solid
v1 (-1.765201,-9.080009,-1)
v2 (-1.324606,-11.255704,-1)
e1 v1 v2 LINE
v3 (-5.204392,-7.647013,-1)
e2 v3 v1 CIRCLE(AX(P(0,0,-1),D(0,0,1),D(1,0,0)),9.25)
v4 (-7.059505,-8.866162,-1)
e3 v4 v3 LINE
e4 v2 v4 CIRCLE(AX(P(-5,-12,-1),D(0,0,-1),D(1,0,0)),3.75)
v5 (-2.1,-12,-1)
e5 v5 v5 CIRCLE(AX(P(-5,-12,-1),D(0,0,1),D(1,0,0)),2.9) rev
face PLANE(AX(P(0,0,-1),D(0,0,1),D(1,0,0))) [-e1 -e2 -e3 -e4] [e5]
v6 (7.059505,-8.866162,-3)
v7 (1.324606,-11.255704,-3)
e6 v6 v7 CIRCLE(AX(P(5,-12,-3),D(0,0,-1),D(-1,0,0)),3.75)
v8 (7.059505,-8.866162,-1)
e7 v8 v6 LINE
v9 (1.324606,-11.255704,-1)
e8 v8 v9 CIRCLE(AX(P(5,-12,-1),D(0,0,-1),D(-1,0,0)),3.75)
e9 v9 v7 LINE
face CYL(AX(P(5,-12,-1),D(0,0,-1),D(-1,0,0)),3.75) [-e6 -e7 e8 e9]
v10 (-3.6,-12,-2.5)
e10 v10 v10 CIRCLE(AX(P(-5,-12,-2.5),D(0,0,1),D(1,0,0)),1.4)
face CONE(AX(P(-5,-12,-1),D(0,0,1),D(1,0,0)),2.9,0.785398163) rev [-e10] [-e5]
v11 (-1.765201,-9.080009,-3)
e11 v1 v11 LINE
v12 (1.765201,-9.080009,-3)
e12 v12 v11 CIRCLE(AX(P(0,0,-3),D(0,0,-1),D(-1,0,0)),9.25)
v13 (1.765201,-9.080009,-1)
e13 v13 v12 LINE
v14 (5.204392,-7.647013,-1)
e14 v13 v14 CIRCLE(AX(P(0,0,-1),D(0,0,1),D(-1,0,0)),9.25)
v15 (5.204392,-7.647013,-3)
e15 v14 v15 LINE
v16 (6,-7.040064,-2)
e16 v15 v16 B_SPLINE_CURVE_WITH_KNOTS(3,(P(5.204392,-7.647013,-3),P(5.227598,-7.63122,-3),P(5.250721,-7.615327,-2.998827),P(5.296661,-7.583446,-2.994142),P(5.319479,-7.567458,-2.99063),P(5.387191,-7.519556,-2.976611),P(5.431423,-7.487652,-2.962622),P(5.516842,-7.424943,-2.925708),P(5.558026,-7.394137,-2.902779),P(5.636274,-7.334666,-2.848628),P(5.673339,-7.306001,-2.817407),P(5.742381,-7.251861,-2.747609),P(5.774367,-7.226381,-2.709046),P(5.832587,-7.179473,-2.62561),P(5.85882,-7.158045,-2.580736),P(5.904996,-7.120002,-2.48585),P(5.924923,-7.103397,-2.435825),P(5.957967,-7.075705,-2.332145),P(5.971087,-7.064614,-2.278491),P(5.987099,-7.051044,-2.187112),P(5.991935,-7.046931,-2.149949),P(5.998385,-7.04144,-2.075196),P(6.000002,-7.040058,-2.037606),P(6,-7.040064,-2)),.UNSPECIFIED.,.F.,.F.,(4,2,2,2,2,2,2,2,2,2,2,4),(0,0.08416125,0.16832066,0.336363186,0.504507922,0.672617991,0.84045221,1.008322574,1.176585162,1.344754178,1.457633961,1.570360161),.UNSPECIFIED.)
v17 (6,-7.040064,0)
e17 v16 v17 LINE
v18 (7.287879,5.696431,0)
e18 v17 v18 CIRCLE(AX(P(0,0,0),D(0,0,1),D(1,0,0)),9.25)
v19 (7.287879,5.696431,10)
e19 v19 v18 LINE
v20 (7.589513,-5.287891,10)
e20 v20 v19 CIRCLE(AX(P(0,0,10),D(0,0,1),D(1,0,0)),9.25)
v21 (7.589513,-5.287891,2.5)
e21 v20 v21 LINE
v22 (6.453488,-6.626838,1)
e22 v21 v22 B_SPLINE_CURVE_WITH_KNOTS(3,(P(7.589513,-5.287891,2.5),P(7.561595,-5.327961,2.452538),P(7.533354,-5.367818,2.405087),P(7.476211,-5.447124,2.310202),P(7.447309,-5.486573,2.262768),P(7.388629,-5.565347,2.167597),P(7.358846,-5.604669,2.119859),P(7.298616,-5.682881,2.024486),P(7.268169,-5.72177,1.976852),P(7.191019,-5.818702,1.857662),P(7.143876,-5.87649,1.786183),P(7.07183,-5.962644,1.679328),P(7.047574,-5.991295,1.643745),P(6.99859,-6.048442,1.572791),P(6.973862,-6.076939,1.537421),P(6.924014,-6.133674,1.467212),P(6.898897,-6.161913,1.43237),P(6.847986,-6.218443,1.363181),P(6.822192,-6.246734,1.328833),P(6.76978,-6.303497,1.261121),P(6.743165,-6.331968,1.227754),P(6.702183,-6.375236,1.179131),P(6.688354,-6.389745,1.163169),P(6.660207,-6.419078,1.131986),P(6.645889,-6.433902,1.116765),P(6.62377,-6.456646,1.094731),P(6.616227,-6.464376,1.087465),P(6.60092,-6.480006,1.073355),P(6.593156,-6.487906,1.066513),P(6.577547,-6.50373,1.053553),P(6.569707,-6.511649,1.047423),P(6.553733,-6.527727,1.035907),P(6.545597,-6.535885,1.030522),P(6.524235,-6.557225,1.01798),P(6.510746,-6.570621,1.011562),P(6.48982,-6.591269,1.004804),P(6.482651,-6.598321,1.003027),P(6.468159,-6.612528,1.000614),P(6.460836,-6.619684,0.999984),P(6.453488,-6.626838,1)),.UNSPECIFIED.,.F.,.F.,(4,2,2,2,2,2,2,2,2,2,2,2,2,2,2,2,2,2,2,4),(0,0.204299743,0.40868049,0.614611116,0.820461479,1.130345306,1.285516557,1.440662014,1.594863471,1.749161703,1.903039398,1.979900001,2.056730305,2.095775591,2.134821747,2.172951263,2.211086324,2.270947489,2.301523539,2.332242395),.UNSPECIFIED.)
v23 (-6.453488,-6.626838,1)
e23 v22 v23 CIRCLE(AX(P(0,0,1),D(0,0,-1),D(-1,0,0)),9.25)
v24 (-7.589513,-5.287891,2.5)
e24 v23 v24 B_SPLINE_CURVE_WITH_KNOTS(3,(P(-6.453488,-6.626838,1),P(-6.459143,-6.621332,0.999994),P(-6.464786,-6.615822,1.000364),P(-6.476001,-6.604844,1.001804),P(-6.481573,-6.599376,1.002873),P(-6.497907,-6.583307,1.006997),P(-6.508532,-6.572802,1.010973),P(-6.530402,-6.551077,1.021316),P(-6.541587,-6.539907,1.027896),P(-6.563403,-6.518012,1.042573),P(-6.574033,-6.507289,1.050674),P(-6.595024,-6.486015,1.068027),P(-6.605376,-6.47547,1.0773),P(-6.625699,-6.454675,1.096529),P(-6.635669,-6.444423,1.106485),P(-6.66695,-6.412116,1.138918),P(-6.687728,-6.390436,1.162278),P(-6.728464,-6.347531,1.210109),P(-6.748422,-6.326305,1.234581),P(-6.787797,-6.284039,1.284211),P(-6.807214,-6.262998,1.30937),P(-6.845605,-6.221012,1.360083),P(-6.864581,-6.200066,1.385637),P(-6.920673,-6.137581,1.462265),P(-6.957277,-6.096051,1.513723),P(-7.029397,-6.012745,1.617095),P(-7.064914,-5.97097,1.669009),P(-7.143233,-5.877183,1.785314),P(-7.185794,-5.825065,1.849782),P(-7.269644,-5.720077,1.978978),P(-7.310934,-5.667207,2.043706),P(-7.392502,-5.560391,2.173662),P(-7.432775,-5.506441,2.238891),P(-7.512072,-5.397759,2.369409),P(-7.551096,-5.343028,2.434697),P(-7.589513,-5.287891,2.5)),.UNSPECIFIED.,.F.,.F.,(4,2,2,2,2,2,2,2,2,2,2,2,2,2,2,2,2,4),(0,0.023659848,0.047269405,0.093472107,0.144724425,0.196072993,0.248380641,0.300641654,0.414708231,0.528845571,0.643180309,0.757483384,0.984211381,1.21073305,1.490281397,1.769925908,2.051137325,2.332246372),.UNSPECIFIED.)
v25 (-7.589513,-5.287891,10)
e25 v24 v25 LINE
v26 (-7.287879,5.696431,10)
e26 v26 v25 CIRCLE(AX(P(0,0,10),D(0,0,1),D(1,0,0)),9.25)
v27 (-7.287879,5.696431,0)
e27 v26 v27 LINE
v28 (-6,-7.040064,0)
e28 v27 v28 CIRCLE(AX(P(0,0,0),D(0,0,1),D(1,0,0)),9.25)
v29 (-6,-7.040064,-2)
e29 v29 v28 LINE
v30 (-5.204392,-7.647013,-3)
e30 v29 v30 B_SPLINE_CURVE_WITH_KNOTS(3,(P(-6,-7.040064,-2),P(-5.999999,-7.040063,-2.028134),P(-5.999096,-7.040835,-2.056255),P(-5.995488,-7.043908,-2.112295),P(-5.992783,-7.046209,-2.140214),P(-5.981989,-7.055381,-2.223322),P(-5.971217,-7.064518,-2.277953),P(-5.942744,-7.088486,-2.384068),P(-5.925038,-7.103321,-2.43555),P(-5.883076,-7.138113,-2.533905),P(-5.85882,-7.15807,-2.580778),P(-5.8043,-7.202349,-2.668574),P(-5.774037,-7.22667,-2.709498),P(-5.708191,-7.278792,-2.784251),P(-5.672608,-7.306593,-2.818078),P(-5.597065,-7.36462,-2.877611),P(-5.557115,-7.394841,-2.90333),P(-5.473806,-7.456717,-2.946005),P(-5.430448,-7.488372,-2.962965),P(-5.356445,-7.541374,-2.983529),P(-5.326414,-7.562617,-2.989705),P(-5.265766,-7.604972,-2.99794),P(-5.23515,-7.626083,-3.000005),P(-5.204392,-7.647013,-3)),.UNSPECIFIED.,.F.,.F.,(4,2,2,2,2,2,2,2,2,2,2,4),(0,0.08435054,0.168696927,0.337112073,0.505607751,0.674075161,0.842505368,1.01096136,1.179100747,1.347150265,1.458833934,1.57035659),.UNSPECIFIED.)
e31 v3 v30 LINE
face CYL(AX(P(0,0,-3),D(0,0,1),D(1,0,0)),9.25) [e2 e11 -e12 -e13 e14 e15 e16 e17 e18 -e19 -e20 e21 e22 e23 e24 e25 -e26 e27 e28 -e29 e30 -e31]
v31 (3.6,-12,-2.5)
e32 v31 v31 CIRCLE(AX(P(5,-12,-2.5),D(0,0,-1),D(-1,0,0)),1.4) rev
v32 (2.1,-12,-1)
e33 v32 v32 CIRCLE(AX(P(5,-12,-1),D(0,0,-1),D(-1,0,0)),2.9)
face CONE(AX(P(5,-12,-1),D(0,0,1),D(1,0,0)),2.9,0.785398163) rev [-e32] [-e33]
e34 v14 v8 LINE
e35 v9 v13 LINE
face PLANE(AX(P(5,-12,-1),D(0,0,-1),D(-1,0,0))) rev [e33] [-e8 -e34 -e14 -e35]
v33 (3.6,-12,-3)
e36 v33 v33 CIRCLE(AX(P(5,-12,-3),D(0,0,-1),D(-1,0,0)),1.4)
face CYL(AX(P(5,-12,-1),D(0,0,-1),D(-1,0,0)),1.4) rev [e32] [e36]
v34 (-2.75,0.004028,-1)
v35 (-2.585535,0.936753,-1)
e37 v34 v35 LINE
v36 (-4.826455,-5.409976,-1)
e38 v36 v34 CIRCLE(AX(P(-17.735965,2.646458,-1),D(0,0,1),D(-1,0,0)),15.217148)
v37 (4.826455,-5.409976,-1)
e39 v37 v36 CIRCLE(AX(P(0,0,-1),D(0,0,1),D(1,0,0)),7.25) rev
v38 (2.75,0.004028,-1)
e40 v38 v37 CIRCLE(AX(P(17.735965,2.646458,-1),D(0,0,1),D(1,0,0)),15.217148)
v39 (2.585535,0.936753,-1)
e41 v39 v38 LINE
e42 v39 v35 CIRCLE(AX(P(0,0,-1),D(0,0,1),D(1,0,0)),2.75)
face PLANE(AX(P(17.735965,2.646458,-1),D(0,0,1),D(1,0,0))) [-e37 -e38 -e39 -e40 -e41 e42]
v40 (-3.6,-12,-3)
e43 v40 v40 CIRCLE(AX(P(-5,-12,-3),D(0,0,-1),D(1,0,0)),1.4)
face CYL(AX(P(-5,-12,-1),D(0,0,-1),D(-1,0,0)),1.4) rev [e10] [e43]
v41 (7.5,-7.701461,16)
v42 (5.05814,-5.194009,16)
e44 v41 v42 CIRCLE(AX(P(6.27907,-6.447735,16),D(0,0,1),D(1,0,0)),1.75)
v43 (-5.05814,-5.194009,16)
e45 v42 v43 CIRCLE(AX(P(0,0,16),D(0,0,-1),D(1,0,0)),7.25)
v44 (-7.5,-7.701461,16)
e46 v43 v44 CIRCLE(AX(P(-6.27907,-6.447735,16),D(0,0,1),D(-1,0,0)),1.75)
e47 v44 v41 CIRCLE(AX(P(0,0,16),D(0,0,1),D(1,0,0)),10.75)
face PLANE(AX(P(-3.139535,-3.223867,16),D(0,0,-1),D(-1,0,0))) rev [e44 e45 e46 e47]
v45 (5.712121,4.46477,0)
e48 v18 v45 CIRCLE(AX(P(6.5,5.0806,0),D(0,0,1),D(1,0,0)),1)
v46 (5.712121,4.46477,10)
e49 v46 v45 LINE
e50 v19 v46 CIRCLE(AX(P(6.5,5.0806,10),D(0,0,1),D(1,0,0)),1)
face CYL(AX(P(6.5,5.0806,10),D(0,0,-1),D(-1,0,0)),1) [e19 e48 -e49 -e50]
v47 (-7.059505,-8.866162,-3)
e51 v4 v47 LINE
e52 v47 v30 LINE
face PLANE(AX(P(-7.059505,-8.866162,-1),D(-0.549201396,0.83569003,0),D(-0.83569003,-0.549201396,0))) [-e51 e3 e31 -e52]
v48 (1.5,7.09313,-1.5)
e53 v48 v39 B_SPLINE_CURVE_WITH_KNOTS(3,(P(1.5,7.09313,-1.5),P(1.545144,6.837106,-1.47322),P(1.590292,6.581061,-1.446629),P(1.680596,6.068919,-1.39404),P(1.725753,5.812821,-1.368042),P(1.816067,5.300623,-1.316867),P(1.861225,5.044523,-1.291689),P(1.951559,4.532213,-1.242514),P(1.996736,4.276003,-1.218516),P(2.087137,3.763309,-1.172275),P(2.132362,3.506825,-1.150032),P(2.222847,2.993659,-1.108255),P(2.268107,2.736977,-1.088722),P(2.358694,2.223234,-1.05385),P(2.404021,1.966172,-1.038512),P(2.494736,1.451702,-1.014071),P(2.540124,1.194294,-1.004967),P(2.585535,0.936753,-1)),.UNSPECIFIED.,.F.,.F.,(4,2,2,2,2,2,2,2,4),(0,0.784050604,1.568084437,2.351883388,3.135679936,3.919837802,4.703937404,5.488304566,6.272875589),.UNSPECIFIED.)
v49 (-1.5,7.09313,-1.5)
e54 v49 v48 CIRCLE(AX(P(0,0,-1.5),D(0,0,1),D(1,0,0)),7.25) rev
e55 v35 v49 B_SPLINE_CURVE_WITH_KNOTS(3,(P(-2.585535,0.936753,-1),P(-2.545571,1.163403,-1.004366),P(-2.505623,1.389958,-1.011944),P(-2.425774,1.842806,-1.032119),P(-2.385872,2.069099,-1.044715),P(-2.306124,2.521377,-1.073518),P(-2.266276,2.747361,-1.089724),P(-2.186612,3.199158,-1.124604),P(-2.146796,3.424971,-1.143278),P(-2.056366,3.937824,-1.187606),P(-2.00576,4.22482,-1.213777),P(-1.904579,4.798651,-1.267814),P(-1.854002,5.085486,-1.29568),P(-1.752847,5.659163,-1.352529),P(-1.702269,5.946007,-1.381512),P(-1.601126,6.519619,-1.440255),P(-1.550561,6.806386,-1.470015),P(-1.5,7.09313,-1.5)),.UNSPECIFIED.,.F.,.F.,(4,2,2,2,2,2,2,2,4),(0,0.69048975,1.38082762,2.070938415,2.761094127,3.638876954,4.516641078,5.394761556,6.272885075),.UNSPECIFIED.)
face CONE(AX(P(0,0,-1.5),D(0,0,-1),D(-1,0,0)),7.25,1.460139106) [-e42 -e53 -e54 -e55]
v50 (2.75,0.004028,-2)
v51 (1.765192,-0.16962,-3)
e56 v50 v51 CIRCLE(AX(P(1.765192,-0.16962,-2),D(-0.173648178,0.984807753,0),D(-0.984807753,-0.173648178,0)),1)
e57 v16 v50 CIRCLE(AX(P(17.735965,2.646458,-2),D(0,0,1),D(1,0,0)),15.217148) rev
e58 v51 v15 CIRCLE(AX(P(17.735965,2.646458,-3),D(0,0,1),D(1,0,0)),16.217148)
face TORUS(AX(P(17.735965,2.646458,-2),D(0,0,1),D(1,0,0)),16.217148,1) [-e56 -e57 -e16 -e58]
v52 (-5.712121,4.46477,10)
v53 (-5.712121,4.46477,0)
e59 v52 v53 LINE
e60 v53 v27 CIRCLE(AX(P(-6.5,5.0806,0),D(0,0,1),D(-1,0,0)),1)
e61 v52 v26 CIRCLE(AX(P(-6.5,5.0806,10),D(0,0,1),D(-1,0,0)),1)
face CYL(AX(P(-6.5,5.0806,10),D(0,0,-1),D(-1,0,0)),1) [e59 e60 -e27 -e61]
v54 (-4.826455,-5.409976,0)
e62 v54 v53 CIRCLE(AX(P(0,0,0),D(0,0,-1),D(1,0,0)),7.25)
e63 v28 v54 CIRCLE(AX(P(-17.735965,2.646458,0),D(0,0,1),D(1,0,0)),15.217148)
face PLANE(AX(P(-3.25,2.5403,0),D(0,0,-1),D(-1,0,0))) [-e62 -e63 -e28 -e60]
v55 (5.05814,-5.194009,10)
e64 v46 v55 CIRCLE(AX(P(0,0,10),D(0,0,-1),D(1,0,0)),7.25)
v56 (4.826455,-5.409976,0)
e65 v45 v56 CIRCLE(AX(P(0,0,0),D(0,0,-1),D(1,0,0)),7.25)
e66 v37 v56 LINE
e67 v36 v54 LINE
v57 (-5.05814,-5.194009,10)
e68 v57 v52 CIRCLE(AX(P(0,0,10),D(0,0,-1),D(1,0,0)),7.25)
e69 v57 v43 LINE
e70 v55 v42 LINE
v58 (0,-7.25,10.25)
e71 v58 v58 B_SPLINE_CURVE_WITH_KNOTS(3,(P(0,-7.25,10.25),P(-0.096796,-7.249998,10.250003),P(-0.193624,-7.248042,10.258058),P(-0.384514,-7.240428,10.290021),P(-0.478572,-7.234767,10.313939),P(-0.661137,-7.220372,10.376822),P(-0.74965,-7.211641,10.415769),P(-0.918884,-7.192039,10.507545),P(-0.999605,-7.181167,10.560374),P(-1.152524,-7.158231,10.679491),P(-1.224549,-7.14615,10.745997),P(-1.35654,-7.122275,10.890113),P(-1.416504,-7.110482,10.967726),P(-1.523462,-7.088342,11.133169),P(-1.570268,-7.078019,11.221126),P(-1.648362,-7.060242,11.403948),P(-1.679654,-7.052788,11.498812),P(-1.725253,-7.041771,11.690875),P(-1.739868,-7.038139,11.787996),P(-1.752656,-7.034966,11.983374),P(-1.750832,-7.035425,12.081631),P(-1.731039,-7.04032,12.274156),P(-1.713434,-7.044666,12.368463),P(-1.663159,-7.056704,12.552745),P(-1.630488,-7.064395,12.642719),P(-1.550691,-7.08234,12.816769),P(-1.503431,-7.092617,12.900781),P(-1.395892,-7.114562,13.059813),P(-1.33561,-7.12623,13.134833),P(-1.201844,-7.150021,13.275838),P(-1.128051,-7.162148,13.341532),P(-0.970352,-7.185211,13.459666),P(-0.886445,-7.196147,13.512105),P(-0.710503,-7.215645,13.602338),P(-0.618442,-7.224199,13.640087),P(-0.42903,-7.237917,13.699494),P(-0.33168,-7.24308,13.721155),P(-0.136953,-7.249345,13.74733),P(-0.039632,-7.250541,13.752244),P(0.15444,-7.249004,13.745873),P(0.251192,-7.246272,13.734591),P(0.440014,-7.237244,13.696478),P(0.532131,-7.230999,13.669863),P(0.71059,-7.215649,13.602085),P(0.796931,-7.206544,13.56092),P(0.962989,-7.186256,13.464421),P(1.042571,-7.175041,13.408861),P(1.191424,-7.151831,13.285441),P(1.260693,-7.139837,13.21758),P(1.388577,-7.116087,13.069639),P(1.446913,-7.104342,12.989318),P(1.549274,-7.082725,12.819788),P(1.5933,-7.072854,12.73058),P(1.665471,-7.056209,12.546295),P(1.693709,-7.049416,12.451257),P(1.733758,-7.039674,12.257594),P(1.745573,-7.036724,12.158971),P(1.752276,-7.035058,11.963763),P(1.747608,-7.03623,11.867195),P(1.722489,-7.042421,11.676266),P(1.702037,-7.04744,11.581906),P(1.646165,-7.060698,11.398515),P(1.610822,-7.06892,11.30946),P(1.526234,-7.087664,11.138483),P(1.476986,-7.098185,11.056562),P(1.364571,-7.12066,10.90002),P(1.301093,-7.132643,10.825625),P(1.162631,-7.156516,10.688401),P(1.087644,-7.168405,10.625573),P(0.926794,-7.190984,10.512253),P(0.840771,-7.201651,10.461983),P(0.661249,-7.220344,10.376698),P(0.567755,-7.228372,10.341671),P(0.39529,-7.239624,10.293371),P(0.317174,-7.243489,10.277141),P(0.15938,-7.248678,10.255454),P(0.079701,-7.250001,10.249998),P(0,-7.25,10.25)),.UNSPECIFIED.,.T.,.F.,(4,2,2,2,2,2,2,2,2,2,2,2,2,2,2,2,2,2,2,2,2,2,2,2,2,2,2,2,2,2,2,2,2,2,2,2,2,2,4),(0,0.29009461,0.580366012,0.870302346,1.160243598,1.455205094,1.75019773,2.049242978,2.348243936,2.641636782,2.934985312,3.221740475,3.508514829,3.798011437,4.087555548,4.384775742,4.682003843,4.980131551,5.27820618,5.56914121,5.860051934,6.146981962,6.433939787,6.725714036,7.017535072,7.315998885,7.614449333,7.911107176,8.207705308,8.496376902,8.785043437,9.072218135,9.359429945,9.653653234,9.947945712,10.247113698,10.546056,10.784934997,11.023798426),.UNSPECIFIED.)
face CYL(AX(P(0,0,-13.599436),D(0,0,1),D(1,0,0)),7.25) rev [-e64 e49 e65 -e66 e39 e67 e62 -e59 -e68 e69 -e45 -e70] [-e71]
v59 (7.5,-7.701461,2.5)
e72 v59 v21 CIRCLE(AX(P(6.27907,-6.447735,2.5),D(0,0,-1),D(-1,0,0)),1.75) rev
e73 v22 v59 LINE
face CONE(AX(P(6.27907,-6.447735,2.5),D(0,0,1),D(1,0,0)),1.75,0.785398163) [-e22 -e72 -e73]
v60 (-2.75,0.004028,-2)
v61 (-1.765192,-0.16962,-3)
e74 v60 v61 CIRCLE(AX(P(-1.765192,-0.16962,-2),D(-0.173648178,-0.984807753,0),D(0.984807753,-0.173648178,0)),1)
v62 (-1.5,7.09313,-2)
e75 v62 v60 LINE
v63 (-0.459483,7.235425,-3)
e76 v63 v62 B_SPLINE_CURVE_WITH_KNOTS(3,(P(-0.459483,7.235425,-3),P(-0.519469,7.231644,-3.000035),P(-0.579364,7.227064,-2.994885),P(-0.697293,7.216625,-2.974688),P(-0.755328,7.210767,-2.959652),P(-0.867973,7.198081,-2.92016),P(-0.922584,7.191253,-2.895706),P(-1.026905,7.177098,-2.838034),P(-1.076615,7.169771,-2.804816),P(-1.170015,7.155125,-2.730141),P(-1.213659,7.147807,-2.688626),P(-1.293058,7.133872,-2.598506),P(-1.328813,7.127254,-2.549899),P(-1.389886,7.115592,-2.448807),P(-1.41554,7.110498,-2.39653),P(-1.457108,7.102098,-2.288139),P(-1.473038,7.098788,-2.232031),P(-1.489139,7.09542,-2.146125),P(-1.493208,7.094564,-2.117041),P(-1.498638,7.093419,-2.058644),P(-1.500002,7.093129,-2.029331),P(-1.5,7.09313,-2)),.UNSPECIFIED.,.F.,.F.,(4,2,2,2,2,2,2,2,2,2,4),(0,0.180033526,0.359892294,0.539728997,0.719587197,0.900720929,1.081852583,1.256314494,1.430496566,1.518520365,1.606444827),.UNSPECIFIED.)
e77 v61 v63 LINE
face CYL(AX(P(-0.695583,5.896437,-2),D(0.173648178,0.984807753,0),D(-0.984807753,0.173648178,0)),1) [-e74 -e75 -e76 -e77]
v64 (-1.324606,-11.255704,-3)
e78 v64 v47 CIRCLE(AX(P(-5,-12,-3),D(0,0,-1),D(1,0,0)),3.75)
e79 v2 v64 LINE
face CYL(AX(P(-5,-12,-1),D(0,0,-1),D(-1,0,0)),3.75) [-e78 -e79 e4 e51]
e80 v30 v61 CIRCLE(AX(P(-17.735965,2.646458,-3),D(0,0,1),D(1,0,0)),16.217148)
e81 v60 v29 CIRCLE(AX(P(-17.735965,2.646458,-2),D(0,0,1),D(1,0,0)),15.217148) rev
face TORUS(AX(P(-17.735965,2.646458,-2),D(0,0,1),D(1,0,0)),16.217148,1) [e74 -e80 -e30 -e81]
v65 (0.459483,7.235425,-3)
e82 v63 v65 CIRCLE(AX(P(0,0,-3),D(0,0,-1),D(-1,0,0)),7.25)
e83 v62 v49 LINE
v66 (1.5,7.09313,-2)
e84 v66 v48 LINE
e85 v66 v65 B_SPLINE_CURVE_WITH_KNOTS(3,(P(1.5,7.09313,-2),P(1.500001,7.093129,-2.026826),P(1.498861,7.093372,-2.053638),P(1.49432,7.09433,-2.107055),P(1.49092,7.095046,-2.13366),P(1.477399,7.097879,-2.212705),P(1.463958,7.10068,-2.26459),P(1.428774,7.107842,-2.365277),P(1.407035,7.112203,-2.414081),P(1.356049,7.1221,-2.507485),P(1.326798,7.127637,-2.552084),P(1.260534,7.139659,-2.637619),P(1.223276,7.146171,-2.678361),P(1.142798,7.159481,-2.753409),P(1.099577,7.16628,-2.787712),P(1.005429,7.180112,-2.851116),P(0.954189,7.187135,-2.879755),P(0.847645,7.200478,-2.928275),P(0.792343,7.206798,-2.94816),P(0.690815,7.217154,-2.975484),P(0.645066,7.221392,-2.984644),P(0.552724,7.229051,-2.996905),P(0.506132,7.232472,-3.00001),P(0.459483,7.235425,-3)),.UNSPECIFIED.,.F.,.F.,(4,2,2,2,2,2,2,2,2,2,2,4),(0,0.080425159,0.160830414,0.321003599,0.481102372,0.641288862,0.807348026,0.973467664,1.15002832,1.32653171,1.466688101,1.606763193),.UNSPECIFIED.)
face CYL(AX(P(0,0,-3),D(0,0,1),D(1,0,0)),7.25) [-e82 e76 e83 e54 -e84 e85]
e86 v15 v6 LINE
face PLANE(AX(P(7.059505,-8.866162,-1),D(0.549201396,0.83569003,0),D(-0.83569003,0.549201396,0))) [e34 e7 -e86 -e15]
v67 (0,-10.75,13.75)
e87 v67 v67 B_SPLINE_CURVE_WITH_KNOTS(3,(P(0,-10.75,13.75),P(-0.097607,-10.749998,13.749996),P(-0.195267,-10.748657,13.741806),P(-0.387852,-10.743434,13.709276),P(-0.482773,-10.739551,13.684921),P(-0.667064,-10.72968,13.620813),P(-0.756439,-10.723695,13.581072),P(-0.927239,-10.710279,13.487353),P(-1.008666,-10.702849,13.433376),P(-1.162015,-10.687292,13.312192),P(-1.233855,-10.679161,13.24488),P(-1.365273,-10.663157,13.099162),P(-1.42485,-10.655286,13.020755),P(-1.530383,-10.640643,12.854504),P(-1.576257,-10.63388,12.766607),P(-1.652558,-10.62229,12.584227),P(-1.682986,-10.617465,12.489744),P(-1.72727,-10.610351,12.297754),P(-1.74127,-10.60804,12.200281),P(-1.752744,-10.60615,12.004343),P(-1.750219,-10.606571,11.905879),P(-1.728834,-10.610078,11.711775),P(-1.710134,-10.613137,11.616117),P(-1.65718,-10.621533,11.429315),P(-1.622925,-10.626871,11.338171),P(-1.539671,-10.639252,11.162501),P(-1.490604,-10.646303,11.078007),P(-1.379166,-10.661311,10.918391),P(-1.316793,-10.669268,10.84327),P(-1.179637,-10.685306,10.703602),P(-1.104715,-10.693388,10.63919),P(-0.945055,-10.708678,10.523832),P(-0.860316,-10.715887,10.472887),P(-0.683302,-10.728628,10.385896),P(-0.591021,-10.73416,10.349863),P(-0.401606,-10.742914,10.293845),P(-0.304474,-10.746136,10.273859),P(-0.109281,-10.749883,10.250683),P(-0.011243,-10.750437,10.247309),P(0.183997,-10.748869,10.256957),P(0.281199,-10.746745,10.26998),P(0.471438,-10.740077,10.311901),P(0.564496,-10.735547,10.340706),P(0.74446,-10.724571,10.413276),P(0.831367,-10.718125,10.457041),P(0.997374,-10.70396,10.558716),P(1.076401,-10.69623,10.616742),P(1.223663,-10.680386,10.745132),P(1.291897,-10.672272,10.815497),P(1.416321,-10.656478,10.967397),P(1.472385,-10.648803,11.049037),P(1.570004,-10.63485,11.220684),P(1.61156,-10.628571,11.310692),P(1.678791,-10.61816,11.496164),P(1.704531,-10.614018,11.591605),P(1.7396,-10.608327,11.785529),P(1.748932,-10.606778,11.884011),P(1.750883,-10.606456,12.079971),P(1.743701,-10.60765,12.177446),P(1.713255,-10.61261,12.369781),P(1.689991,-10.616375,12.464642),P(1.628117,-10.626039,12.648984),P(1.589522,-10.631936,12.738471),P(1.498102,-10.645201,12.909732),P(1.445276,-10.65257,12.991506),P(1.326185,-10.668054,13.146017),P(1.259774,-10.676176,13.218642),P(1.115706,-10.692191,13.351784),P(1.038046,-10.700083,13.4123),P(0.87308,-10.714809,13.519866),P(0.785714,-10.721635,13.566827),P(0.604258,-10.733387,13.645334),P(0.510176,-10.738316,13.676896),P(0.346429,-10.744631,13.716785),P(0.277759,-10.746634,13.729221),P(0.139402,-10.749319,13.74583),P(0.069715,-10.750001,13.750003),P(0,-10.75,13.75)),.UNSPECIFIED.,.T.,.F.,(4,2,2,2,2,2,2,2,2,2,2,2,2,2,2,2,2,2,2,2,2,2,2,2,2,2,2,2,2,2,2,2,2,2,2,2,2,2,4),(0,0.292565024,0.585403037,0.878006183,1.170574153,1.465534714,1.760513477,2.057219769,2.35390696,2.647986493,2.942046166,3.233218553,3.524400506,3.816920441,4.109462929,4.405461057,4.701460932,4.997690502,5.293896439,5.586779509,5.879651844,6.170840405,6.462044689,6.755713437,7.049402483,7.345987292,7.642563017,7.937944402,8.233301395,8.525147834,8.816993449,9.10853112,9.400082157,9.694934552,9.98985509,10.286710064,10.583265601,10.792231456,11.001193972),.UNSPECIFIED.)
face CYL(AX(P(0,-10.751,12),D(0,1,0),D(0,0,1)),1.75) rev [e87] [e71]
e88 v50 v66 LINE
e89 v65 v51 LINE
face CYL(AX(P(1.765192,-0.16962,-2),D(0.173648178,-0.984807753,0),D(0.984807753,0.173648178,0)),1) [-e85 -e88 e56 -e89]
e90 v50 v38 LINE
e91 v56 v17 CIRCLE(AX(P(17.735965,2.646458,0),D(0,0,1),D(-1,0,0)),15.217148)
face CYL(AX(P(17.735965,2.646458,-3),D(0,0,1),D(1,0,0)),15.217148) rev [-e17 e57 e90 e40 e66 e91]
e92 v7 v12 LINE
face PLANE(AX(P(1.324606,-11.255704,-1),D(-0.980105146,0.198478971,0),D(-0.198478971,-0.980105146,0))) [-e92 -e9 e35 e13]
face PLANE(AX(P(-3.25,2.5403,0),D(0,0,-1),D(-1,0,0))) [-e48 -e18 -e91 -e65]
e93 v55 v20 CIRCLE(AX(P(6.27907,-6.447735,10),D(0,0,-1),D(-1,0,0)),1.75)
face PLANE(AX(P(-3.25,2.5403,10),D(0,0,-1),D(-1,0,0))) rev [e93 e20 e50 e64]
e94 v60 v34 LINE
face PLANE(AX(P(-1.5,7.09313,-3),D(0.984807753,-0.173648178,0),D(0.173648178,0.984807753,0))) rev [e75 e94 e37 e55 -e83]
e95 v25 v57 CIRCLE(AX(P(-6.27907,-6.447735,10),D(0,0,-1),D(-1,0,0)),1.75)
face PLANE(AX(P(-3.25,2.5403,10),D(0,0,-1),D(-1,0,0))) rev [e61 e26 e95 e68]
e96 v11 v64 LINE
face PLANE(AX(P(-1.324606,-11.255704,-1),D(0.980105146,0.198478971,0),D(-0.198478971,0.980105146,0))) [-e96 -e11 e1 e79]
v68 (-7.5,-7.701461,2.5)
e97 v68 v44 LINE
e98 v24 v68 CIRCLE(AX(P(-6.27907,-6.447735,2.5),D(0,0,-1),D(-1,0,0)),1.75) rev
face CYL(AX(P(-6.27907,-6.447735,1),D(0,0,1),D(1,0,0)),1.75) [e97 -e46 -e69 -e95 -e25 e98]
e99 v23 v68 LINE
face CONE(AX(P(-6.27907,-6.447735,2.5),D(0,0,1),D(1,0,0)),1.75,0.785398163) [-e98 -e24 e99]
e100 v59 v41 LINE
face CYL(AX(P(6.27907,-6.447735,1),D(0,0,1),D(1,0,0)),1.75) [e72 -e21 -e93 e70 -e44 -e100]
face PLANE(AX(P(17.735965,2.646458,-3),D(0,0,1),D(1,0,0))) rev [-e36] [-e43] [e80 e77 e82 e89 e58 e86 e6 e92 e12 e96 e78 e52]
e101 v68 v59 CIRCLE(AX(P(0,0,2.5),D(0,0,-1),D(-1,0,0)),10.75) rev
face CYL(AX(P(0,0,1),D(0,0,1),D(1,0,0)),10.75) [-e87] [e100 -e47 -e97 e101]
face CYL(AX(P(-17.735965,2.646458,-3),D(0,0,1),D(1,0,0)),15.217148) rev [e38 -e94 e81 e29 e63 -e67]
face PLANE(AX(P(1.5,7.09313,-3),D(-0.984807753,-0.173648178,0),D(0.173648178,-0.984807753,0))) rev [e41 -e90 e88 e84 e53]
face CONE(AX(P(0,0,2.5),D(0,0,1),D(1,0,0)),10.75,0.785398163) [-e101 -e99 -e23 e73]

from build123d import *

# Parameters (mm, degrees)
EXTRUDE_577_DEPTH                       = 10
EXTRUDE_START                           = 3
EXTRUDE_1331_DEPTH                      = 2
FILLET_1_R                              = 1
EXTRUDE_2001_DEPTH                      = 6
EXTRUDE_2001_DEPTH_BACK                 = 9
CUT_EXTRUDE_2109_REACH                  = 26.775
CUT_EXTRUDE_2109_END_RADIUS             = 7.25
SKETCH_6_R                              = 1.75
CUT_EXTRUDE_2109_DIRECTION_2_REACH      = 26.775
CUT_EXTRUDE_2109_DIRECTION_2_END_RADIUS = 10.75
SKETCH_7_R                              = 1.4
EXTRUDE_2720_DEPTH                      = 2
EXTRUDE_2720_2_DEPTH                    = 2
CHAMFER_2_SIZE                          = 1.5
EXTRUDE_START_2                         = 1
EXTRUDE_3078_DEPTH                      = 1
CHAMFER_3_SIZE                          = 1.5
CHAMFER_4_SIZE                          = 4.5
CHAMFER_4_SIZE2                         = 0.5


# Some blends are built 0.0001 mm under size
with BuildPart() as part:
    # Эскиз1 → Extrude 577 (new body)
    with BuildSketch(Plane.XY):
        with BuildLine():
            ThreePointArc((-5.712121212, 4.464770012), (0, -7.25), (5.712121212, 4.464770012))
            ThreePointArc((5.712121212, 4.464770012), (5.884169654, 5.868479146), (7.287878788, 5.696430705))
            ThreePointArc((7.287878788, 5.696430705), (0, -9.25), (-7.287878788, 5.696430705))
            ThreePointArc((-7.287878788, 5.696430705), (-5.884169654, 5.868479146), (-5.712121212, 4.464770012))
        make_face()
    extrude(amount=EXTRUDE_577_DEPTH)

    # Эскиз5 → Extrude 2001 (add, two sides: drawn at the far end of the back side and taken through both)
    with BuildSketch(Plane.XY.offset(10).offset(-EXTRUDE_2001_DEPTH_BACK)):
        with BuildLine():
            ThreePointArc((-5.058139535, -5.194008514), (0, -7.25), (5.058139535, -5.194008514))
            ThreePointArc((5.058139535, -5.194008514), (7.532795961, -5.226804475), (7.5, -7.7014609))
            ThreePointArc((7.5, -7.7014609), (0, -10.75), (-7.5, -7.7014609))
            ThreePointArc((-7.5, -7.7014609), (-7.532795961, -5.226804475), (-5.058139535, -5.194008514))
        make_face()
    extrude(amount=EXTRUDE_2001_DEPTH + EXTRUDE_2001_DEPTH_BACK)

    # Cut-Extrude 2109: up to this cylinder (the profile starts outside it)
    cut_extrude_2109_end = Plane(origin=(0, 0, 12), z_dir=(0, 0, -1)) * Cylinder(CUT_EXTRUDE_2109_END_RADIUS, 69.05, mode=Mode.PRIVATE)
    # Эскиз6 → Cut-Extrude 2109 (cut, up to the surface)
    with BuildSketch(Plane(origin=(0, -9.25, 0), x_dir=(-1, 0, 0), z_dir=(0, -1, 0)), mode=Mode.PRIVATE) as cut_extrude_2109_sk1:
        with Locations(Location((0, -12, 0), (0, 0, 270))):
            Circle(SKETCH_6_R)
    cut_extrude_2109_tool1 = extrude(cut_extrude_2109_sk1.sketch, amount=-CUT_EXTRUDE_2109_REACH, mode=Mode.PRIVATE) - cut_extrude_2109_end
    add(cut_extrude_2109_tool1.solids().sort_by_distance((0, -9.25, 12))[0], mode=Mode.SUBTRACT)

    # Cut-Extrude 2109 direction 2: up to this cylinder (the profile starts inside it)
    cut_extrude_2109_direction_2_end = Plane(origin=(0, 0, 12), z_dir=(0, 0, 1)) * Cylinder(CUT_EXTRUDE_2109_DIRECTION_2_END_RADIUS, 76.05, mode=Mode.PRIVATE)
    # Эскиз6 → Cut-Extrude 2109 direction 2 (cut, up to the surface)
    with BuildSketch(Plane(origin=(0, -9.25, 0), x_dir=(-1, 0, 0), z_dir=(0, -1, 0)), mode=Mode.PRIVATE) as cut_extrude_2109_direction_2_sk1:
        with Locations(Location((0, -12, 0), (0, 0, 270))):
            Circle(SKETCH_6_R)
    cut_extrude_2109_direction_2_tool1 = extrude(cut_extrude_2109_direction_2_sk1.sketch, amount=CUT_EXTRUDE_2109_DIRECTION_2_REACH, mode=Mode.PRIVATE) & cut_extrude_2109_direction_2_end
    add(cut_extrude_2109_direction_2_tool1.solids().sort_by_distance((0, -9.25, 12))[0], mode=Mode.SUBTRACT)

    # Фаска2
    chamfer_2_edges = [part.edges().sort_by_distance(p)[0] for p in [
        (-8.027867462, -6.512593205, 1),
        (8.027867462, -6.512593205, 1),
        (0, -10.75, 1),
    ]]
    chamfer(chamfer_2_edges, length=CHAMFER_2_SIZE - 0.0001)  # a hair under: the kernel refuses the full size



with BuildPart() as body_2:
    # Эскиз3 → Extrude 1331 (new body)
    with BuildSketch(Plane(origin=(0, 0, 0), x_dir=(-1, 0, 0), z_dir=(0, 0, -1)).offset(EXTRUDE_START)):
        with BuildLine():
            Line((-1.5, 7.09313048), (-2.75, 0.004028205))
            ThreePointArc((-2.75, 0.004028205), (-3.918577626, -3.728601804), (-6, -7.04006392))
            ThreePointArc((-6, -7.04006392), (0, -9.25), (6, -7.04006392))
            ThreePointArc((6, -7.04006392), (3.918577626, -3.728601804), (2.75, 0.004028205))
            Line((2.75, 0.004028205), (1.5, 7.09313048))
            ThreePointArc((1.5, 7.09313048), (0, 7.25), (-1.5, 7.09313048))
        make_face()
    extrude(amount=-EXTRUDE_1331_DEPTH)

    # Скругление1
    # the kernel refuses this fillet: 1 mm, written as the material it takes off along each edge
    with BuildSketch(Plane(origin=(-17.735965382, 2.646458234, -3), x_dir=(0.6567344577177726, -0.7541219079473445, 0), z_dir=(-0.7541219079473445, -0.6567344577177726, 0))) as fillet_1_piece_1:
        with BuildLine():
            CenterArc((15.217148054 + FILLET_1_R, FILLET_1_R), FILLET_1_R, 180, 90)
            Line((15.217148054 + FILLET_1_R, 0), (15.217148054, 0))
            Line((15.217148054, 0), (15.217148054, FILLET_1_R))
        make_face()
    revolve(axis=Axis((-17.735965382, 2.646458234, -3), (0, 0, 1)), revolution_arc=38.948703068, mode=Mode.SUBTRACT)
    with BuildSketch(Plane(origin=(-2.75, 0.004028205, -3), x_dir=(0, 0, 1), z_dir=(0.17364817766693094, 0.984807753012208, 0)), Plane(origin=(1.065879556, 9.555149862, -3), x_dir=(0, 0, 1), z_dir=(0.1736481776669306, -0.984807753012208, 0))) as fillet_1_piece_2:
        with BuildLine():
            CenterArc((FILLET_1_R, FILLET_1_R), FILLET_1_R, 180, 90)
            Line((0, FILLET_1_R), (0, 0))
            Line((0, 0), (FILLET_1_R, 0))
        make_face()
    extrude(amount=9.698463104, mode=Mode.SUBTRACT)
    with BuildSketch(Plane(origin=(17.735965382, 2.646458234, -3), x_dir=(-0.9848077530122082, -0.17364817766692925, 0), z_dir=(-0.17364817766692925, 0.9848077530122082, 0))) as fillet_1_piece_3:
        with BuildLine():
            CenterArc((15.217148054 + FILLET_1_R, FILLET_1_R), FILLET_1_R, 180, 90)
            Line((15.217148054 + FILLET_1_R, 0), (15.217148054, 0))
            Line((15.217148054, 0), (15.217148054, FILLET_1_R))
        make_face()
    revolve(axis=Axis((17.735965382, 2.646458234, -3), (0, 0, 1)), revolution_arc=38.948703068, mode=Mode.SUBTRACT)


with BuildPart() as body_3:
    # Эскиз7 → Extrude 2720 (new body)
    with BuildSketch(Plane(origin=(0, 0, -3), x_dir=(-1, 0, 0), z_dir=(0, 0, -1))):
        with BuildLine():
            Line((-7.059505235, -8.866162387), (-5.204391621, -7.647013002))
            ThreePointArc((-5.204391621, -7.647013002), (-3.557692308, -8.538461538), (-1.765200931, -9.080009123))
            Line((-1.765200931, -9.080009123), (-1.324605701, -11.255703859))
            ThreePointArc((-1.324605701, -11.255703859), (-6.442307692, -15.461538462), (-7.059505235, -8.866162387))
        make_face()
        with Locations((-5, -12)):
            Circle(SKETCH_7_R, mode=Mode.SUBTRACT)
    extrude(amount=-EXTRUDE_2720_DEPTH)


with BuildPart() as body_4:
    # Эскиз7 → Extrude 2720 2 (new body)
    with BuildSketch(Plane(origin=(0, 0, -3), x_dir=(-1, 0, 0), z_dir=(0, 0, -1))):
        with BuildLine():
            Line((1.324605701, -11.255703859), (1.765200931, -9.080009123))
            ThreePointArc((1.765200931, -9.080009123), (3.557692308, -8.538461538), (5.204391621, -7.647013002))
            Line((5.204391621, -7.647013002), (7.059505235, -8.866162387))
            ThreePointArc((7.059505235, -8.866162387), (6.442307692, -15.461538462), (1.324605701, -11.255703859))
        make_face()
        with Locations(Location((5, -12, 0), (0, 0, 180))):
            Circle(SKETCH_7_R, mode=Mode.SUBTRACT)
    extrude(amount=-EXTRUDE_2720_2_DEPTH)


with BuildPart() as part_1:
    add(part.part)

    add(body_2.part)  # Extrude 3078 merges body 2

    add(body_3.part)  # Extrude 3078 merges body 3

    add(body_4.part)  # Extrude 3078 merges body 4
    # Эскиз8 → Extrude 3078 (add)
    with BuildSketch(Plane(origin=(0, 0, 0), x_dir=(-1, 0, 0), z_dir=(0, 0, -1)).offset(EXTRUDE_START_2)):
        with BuildLine():
            ThreePointArc((-6, -7.04006392), (0, -9.25), (6, -7.04006392))
            ThreePointArc((6, -7.04006392), (5.386302599, -6.244403593), (4.826454597, -5.409975603))
            ThreePointArc((4.826454597, -5.409975603), (0, -7.25), (-4.826454597, -5.409975603))
            ThreePointArc((-4.826454597, -5.409975603), (-5.386302599, -6.244403593), (-6, -7.04006392))
        make_face()
    extrude(amount=-EXTRUDE_3078_DEPTH)

    # Фаска3
    chamfer_3_edges = [part_1.edges().sort_by_distance(p)[0] for p in [
        (6.4, -12, -1),
        (-6.4, -12, -1),
    ]]
    chamfer(chamfer_3_edges, length=CHAMFER_3_SIZE)

    # Фаска4
    chamfer_4_edges = [part_1.edges().sort_by_distance(p)[0] for p in [
        (0, 7.25, -1),
    ]]
    chamfer_4_side = [part_1.faces().sort_by_distance(p)[0] for p in [
        (0, -1.121169898, -1),
    ]]
    chamfer(chamfer_4_edges, length=CHAMFER_4_SIZE, length2=CHAMFER_4_SIZE2, reference=chamfer_4_side[0])


solid = part_1.part
